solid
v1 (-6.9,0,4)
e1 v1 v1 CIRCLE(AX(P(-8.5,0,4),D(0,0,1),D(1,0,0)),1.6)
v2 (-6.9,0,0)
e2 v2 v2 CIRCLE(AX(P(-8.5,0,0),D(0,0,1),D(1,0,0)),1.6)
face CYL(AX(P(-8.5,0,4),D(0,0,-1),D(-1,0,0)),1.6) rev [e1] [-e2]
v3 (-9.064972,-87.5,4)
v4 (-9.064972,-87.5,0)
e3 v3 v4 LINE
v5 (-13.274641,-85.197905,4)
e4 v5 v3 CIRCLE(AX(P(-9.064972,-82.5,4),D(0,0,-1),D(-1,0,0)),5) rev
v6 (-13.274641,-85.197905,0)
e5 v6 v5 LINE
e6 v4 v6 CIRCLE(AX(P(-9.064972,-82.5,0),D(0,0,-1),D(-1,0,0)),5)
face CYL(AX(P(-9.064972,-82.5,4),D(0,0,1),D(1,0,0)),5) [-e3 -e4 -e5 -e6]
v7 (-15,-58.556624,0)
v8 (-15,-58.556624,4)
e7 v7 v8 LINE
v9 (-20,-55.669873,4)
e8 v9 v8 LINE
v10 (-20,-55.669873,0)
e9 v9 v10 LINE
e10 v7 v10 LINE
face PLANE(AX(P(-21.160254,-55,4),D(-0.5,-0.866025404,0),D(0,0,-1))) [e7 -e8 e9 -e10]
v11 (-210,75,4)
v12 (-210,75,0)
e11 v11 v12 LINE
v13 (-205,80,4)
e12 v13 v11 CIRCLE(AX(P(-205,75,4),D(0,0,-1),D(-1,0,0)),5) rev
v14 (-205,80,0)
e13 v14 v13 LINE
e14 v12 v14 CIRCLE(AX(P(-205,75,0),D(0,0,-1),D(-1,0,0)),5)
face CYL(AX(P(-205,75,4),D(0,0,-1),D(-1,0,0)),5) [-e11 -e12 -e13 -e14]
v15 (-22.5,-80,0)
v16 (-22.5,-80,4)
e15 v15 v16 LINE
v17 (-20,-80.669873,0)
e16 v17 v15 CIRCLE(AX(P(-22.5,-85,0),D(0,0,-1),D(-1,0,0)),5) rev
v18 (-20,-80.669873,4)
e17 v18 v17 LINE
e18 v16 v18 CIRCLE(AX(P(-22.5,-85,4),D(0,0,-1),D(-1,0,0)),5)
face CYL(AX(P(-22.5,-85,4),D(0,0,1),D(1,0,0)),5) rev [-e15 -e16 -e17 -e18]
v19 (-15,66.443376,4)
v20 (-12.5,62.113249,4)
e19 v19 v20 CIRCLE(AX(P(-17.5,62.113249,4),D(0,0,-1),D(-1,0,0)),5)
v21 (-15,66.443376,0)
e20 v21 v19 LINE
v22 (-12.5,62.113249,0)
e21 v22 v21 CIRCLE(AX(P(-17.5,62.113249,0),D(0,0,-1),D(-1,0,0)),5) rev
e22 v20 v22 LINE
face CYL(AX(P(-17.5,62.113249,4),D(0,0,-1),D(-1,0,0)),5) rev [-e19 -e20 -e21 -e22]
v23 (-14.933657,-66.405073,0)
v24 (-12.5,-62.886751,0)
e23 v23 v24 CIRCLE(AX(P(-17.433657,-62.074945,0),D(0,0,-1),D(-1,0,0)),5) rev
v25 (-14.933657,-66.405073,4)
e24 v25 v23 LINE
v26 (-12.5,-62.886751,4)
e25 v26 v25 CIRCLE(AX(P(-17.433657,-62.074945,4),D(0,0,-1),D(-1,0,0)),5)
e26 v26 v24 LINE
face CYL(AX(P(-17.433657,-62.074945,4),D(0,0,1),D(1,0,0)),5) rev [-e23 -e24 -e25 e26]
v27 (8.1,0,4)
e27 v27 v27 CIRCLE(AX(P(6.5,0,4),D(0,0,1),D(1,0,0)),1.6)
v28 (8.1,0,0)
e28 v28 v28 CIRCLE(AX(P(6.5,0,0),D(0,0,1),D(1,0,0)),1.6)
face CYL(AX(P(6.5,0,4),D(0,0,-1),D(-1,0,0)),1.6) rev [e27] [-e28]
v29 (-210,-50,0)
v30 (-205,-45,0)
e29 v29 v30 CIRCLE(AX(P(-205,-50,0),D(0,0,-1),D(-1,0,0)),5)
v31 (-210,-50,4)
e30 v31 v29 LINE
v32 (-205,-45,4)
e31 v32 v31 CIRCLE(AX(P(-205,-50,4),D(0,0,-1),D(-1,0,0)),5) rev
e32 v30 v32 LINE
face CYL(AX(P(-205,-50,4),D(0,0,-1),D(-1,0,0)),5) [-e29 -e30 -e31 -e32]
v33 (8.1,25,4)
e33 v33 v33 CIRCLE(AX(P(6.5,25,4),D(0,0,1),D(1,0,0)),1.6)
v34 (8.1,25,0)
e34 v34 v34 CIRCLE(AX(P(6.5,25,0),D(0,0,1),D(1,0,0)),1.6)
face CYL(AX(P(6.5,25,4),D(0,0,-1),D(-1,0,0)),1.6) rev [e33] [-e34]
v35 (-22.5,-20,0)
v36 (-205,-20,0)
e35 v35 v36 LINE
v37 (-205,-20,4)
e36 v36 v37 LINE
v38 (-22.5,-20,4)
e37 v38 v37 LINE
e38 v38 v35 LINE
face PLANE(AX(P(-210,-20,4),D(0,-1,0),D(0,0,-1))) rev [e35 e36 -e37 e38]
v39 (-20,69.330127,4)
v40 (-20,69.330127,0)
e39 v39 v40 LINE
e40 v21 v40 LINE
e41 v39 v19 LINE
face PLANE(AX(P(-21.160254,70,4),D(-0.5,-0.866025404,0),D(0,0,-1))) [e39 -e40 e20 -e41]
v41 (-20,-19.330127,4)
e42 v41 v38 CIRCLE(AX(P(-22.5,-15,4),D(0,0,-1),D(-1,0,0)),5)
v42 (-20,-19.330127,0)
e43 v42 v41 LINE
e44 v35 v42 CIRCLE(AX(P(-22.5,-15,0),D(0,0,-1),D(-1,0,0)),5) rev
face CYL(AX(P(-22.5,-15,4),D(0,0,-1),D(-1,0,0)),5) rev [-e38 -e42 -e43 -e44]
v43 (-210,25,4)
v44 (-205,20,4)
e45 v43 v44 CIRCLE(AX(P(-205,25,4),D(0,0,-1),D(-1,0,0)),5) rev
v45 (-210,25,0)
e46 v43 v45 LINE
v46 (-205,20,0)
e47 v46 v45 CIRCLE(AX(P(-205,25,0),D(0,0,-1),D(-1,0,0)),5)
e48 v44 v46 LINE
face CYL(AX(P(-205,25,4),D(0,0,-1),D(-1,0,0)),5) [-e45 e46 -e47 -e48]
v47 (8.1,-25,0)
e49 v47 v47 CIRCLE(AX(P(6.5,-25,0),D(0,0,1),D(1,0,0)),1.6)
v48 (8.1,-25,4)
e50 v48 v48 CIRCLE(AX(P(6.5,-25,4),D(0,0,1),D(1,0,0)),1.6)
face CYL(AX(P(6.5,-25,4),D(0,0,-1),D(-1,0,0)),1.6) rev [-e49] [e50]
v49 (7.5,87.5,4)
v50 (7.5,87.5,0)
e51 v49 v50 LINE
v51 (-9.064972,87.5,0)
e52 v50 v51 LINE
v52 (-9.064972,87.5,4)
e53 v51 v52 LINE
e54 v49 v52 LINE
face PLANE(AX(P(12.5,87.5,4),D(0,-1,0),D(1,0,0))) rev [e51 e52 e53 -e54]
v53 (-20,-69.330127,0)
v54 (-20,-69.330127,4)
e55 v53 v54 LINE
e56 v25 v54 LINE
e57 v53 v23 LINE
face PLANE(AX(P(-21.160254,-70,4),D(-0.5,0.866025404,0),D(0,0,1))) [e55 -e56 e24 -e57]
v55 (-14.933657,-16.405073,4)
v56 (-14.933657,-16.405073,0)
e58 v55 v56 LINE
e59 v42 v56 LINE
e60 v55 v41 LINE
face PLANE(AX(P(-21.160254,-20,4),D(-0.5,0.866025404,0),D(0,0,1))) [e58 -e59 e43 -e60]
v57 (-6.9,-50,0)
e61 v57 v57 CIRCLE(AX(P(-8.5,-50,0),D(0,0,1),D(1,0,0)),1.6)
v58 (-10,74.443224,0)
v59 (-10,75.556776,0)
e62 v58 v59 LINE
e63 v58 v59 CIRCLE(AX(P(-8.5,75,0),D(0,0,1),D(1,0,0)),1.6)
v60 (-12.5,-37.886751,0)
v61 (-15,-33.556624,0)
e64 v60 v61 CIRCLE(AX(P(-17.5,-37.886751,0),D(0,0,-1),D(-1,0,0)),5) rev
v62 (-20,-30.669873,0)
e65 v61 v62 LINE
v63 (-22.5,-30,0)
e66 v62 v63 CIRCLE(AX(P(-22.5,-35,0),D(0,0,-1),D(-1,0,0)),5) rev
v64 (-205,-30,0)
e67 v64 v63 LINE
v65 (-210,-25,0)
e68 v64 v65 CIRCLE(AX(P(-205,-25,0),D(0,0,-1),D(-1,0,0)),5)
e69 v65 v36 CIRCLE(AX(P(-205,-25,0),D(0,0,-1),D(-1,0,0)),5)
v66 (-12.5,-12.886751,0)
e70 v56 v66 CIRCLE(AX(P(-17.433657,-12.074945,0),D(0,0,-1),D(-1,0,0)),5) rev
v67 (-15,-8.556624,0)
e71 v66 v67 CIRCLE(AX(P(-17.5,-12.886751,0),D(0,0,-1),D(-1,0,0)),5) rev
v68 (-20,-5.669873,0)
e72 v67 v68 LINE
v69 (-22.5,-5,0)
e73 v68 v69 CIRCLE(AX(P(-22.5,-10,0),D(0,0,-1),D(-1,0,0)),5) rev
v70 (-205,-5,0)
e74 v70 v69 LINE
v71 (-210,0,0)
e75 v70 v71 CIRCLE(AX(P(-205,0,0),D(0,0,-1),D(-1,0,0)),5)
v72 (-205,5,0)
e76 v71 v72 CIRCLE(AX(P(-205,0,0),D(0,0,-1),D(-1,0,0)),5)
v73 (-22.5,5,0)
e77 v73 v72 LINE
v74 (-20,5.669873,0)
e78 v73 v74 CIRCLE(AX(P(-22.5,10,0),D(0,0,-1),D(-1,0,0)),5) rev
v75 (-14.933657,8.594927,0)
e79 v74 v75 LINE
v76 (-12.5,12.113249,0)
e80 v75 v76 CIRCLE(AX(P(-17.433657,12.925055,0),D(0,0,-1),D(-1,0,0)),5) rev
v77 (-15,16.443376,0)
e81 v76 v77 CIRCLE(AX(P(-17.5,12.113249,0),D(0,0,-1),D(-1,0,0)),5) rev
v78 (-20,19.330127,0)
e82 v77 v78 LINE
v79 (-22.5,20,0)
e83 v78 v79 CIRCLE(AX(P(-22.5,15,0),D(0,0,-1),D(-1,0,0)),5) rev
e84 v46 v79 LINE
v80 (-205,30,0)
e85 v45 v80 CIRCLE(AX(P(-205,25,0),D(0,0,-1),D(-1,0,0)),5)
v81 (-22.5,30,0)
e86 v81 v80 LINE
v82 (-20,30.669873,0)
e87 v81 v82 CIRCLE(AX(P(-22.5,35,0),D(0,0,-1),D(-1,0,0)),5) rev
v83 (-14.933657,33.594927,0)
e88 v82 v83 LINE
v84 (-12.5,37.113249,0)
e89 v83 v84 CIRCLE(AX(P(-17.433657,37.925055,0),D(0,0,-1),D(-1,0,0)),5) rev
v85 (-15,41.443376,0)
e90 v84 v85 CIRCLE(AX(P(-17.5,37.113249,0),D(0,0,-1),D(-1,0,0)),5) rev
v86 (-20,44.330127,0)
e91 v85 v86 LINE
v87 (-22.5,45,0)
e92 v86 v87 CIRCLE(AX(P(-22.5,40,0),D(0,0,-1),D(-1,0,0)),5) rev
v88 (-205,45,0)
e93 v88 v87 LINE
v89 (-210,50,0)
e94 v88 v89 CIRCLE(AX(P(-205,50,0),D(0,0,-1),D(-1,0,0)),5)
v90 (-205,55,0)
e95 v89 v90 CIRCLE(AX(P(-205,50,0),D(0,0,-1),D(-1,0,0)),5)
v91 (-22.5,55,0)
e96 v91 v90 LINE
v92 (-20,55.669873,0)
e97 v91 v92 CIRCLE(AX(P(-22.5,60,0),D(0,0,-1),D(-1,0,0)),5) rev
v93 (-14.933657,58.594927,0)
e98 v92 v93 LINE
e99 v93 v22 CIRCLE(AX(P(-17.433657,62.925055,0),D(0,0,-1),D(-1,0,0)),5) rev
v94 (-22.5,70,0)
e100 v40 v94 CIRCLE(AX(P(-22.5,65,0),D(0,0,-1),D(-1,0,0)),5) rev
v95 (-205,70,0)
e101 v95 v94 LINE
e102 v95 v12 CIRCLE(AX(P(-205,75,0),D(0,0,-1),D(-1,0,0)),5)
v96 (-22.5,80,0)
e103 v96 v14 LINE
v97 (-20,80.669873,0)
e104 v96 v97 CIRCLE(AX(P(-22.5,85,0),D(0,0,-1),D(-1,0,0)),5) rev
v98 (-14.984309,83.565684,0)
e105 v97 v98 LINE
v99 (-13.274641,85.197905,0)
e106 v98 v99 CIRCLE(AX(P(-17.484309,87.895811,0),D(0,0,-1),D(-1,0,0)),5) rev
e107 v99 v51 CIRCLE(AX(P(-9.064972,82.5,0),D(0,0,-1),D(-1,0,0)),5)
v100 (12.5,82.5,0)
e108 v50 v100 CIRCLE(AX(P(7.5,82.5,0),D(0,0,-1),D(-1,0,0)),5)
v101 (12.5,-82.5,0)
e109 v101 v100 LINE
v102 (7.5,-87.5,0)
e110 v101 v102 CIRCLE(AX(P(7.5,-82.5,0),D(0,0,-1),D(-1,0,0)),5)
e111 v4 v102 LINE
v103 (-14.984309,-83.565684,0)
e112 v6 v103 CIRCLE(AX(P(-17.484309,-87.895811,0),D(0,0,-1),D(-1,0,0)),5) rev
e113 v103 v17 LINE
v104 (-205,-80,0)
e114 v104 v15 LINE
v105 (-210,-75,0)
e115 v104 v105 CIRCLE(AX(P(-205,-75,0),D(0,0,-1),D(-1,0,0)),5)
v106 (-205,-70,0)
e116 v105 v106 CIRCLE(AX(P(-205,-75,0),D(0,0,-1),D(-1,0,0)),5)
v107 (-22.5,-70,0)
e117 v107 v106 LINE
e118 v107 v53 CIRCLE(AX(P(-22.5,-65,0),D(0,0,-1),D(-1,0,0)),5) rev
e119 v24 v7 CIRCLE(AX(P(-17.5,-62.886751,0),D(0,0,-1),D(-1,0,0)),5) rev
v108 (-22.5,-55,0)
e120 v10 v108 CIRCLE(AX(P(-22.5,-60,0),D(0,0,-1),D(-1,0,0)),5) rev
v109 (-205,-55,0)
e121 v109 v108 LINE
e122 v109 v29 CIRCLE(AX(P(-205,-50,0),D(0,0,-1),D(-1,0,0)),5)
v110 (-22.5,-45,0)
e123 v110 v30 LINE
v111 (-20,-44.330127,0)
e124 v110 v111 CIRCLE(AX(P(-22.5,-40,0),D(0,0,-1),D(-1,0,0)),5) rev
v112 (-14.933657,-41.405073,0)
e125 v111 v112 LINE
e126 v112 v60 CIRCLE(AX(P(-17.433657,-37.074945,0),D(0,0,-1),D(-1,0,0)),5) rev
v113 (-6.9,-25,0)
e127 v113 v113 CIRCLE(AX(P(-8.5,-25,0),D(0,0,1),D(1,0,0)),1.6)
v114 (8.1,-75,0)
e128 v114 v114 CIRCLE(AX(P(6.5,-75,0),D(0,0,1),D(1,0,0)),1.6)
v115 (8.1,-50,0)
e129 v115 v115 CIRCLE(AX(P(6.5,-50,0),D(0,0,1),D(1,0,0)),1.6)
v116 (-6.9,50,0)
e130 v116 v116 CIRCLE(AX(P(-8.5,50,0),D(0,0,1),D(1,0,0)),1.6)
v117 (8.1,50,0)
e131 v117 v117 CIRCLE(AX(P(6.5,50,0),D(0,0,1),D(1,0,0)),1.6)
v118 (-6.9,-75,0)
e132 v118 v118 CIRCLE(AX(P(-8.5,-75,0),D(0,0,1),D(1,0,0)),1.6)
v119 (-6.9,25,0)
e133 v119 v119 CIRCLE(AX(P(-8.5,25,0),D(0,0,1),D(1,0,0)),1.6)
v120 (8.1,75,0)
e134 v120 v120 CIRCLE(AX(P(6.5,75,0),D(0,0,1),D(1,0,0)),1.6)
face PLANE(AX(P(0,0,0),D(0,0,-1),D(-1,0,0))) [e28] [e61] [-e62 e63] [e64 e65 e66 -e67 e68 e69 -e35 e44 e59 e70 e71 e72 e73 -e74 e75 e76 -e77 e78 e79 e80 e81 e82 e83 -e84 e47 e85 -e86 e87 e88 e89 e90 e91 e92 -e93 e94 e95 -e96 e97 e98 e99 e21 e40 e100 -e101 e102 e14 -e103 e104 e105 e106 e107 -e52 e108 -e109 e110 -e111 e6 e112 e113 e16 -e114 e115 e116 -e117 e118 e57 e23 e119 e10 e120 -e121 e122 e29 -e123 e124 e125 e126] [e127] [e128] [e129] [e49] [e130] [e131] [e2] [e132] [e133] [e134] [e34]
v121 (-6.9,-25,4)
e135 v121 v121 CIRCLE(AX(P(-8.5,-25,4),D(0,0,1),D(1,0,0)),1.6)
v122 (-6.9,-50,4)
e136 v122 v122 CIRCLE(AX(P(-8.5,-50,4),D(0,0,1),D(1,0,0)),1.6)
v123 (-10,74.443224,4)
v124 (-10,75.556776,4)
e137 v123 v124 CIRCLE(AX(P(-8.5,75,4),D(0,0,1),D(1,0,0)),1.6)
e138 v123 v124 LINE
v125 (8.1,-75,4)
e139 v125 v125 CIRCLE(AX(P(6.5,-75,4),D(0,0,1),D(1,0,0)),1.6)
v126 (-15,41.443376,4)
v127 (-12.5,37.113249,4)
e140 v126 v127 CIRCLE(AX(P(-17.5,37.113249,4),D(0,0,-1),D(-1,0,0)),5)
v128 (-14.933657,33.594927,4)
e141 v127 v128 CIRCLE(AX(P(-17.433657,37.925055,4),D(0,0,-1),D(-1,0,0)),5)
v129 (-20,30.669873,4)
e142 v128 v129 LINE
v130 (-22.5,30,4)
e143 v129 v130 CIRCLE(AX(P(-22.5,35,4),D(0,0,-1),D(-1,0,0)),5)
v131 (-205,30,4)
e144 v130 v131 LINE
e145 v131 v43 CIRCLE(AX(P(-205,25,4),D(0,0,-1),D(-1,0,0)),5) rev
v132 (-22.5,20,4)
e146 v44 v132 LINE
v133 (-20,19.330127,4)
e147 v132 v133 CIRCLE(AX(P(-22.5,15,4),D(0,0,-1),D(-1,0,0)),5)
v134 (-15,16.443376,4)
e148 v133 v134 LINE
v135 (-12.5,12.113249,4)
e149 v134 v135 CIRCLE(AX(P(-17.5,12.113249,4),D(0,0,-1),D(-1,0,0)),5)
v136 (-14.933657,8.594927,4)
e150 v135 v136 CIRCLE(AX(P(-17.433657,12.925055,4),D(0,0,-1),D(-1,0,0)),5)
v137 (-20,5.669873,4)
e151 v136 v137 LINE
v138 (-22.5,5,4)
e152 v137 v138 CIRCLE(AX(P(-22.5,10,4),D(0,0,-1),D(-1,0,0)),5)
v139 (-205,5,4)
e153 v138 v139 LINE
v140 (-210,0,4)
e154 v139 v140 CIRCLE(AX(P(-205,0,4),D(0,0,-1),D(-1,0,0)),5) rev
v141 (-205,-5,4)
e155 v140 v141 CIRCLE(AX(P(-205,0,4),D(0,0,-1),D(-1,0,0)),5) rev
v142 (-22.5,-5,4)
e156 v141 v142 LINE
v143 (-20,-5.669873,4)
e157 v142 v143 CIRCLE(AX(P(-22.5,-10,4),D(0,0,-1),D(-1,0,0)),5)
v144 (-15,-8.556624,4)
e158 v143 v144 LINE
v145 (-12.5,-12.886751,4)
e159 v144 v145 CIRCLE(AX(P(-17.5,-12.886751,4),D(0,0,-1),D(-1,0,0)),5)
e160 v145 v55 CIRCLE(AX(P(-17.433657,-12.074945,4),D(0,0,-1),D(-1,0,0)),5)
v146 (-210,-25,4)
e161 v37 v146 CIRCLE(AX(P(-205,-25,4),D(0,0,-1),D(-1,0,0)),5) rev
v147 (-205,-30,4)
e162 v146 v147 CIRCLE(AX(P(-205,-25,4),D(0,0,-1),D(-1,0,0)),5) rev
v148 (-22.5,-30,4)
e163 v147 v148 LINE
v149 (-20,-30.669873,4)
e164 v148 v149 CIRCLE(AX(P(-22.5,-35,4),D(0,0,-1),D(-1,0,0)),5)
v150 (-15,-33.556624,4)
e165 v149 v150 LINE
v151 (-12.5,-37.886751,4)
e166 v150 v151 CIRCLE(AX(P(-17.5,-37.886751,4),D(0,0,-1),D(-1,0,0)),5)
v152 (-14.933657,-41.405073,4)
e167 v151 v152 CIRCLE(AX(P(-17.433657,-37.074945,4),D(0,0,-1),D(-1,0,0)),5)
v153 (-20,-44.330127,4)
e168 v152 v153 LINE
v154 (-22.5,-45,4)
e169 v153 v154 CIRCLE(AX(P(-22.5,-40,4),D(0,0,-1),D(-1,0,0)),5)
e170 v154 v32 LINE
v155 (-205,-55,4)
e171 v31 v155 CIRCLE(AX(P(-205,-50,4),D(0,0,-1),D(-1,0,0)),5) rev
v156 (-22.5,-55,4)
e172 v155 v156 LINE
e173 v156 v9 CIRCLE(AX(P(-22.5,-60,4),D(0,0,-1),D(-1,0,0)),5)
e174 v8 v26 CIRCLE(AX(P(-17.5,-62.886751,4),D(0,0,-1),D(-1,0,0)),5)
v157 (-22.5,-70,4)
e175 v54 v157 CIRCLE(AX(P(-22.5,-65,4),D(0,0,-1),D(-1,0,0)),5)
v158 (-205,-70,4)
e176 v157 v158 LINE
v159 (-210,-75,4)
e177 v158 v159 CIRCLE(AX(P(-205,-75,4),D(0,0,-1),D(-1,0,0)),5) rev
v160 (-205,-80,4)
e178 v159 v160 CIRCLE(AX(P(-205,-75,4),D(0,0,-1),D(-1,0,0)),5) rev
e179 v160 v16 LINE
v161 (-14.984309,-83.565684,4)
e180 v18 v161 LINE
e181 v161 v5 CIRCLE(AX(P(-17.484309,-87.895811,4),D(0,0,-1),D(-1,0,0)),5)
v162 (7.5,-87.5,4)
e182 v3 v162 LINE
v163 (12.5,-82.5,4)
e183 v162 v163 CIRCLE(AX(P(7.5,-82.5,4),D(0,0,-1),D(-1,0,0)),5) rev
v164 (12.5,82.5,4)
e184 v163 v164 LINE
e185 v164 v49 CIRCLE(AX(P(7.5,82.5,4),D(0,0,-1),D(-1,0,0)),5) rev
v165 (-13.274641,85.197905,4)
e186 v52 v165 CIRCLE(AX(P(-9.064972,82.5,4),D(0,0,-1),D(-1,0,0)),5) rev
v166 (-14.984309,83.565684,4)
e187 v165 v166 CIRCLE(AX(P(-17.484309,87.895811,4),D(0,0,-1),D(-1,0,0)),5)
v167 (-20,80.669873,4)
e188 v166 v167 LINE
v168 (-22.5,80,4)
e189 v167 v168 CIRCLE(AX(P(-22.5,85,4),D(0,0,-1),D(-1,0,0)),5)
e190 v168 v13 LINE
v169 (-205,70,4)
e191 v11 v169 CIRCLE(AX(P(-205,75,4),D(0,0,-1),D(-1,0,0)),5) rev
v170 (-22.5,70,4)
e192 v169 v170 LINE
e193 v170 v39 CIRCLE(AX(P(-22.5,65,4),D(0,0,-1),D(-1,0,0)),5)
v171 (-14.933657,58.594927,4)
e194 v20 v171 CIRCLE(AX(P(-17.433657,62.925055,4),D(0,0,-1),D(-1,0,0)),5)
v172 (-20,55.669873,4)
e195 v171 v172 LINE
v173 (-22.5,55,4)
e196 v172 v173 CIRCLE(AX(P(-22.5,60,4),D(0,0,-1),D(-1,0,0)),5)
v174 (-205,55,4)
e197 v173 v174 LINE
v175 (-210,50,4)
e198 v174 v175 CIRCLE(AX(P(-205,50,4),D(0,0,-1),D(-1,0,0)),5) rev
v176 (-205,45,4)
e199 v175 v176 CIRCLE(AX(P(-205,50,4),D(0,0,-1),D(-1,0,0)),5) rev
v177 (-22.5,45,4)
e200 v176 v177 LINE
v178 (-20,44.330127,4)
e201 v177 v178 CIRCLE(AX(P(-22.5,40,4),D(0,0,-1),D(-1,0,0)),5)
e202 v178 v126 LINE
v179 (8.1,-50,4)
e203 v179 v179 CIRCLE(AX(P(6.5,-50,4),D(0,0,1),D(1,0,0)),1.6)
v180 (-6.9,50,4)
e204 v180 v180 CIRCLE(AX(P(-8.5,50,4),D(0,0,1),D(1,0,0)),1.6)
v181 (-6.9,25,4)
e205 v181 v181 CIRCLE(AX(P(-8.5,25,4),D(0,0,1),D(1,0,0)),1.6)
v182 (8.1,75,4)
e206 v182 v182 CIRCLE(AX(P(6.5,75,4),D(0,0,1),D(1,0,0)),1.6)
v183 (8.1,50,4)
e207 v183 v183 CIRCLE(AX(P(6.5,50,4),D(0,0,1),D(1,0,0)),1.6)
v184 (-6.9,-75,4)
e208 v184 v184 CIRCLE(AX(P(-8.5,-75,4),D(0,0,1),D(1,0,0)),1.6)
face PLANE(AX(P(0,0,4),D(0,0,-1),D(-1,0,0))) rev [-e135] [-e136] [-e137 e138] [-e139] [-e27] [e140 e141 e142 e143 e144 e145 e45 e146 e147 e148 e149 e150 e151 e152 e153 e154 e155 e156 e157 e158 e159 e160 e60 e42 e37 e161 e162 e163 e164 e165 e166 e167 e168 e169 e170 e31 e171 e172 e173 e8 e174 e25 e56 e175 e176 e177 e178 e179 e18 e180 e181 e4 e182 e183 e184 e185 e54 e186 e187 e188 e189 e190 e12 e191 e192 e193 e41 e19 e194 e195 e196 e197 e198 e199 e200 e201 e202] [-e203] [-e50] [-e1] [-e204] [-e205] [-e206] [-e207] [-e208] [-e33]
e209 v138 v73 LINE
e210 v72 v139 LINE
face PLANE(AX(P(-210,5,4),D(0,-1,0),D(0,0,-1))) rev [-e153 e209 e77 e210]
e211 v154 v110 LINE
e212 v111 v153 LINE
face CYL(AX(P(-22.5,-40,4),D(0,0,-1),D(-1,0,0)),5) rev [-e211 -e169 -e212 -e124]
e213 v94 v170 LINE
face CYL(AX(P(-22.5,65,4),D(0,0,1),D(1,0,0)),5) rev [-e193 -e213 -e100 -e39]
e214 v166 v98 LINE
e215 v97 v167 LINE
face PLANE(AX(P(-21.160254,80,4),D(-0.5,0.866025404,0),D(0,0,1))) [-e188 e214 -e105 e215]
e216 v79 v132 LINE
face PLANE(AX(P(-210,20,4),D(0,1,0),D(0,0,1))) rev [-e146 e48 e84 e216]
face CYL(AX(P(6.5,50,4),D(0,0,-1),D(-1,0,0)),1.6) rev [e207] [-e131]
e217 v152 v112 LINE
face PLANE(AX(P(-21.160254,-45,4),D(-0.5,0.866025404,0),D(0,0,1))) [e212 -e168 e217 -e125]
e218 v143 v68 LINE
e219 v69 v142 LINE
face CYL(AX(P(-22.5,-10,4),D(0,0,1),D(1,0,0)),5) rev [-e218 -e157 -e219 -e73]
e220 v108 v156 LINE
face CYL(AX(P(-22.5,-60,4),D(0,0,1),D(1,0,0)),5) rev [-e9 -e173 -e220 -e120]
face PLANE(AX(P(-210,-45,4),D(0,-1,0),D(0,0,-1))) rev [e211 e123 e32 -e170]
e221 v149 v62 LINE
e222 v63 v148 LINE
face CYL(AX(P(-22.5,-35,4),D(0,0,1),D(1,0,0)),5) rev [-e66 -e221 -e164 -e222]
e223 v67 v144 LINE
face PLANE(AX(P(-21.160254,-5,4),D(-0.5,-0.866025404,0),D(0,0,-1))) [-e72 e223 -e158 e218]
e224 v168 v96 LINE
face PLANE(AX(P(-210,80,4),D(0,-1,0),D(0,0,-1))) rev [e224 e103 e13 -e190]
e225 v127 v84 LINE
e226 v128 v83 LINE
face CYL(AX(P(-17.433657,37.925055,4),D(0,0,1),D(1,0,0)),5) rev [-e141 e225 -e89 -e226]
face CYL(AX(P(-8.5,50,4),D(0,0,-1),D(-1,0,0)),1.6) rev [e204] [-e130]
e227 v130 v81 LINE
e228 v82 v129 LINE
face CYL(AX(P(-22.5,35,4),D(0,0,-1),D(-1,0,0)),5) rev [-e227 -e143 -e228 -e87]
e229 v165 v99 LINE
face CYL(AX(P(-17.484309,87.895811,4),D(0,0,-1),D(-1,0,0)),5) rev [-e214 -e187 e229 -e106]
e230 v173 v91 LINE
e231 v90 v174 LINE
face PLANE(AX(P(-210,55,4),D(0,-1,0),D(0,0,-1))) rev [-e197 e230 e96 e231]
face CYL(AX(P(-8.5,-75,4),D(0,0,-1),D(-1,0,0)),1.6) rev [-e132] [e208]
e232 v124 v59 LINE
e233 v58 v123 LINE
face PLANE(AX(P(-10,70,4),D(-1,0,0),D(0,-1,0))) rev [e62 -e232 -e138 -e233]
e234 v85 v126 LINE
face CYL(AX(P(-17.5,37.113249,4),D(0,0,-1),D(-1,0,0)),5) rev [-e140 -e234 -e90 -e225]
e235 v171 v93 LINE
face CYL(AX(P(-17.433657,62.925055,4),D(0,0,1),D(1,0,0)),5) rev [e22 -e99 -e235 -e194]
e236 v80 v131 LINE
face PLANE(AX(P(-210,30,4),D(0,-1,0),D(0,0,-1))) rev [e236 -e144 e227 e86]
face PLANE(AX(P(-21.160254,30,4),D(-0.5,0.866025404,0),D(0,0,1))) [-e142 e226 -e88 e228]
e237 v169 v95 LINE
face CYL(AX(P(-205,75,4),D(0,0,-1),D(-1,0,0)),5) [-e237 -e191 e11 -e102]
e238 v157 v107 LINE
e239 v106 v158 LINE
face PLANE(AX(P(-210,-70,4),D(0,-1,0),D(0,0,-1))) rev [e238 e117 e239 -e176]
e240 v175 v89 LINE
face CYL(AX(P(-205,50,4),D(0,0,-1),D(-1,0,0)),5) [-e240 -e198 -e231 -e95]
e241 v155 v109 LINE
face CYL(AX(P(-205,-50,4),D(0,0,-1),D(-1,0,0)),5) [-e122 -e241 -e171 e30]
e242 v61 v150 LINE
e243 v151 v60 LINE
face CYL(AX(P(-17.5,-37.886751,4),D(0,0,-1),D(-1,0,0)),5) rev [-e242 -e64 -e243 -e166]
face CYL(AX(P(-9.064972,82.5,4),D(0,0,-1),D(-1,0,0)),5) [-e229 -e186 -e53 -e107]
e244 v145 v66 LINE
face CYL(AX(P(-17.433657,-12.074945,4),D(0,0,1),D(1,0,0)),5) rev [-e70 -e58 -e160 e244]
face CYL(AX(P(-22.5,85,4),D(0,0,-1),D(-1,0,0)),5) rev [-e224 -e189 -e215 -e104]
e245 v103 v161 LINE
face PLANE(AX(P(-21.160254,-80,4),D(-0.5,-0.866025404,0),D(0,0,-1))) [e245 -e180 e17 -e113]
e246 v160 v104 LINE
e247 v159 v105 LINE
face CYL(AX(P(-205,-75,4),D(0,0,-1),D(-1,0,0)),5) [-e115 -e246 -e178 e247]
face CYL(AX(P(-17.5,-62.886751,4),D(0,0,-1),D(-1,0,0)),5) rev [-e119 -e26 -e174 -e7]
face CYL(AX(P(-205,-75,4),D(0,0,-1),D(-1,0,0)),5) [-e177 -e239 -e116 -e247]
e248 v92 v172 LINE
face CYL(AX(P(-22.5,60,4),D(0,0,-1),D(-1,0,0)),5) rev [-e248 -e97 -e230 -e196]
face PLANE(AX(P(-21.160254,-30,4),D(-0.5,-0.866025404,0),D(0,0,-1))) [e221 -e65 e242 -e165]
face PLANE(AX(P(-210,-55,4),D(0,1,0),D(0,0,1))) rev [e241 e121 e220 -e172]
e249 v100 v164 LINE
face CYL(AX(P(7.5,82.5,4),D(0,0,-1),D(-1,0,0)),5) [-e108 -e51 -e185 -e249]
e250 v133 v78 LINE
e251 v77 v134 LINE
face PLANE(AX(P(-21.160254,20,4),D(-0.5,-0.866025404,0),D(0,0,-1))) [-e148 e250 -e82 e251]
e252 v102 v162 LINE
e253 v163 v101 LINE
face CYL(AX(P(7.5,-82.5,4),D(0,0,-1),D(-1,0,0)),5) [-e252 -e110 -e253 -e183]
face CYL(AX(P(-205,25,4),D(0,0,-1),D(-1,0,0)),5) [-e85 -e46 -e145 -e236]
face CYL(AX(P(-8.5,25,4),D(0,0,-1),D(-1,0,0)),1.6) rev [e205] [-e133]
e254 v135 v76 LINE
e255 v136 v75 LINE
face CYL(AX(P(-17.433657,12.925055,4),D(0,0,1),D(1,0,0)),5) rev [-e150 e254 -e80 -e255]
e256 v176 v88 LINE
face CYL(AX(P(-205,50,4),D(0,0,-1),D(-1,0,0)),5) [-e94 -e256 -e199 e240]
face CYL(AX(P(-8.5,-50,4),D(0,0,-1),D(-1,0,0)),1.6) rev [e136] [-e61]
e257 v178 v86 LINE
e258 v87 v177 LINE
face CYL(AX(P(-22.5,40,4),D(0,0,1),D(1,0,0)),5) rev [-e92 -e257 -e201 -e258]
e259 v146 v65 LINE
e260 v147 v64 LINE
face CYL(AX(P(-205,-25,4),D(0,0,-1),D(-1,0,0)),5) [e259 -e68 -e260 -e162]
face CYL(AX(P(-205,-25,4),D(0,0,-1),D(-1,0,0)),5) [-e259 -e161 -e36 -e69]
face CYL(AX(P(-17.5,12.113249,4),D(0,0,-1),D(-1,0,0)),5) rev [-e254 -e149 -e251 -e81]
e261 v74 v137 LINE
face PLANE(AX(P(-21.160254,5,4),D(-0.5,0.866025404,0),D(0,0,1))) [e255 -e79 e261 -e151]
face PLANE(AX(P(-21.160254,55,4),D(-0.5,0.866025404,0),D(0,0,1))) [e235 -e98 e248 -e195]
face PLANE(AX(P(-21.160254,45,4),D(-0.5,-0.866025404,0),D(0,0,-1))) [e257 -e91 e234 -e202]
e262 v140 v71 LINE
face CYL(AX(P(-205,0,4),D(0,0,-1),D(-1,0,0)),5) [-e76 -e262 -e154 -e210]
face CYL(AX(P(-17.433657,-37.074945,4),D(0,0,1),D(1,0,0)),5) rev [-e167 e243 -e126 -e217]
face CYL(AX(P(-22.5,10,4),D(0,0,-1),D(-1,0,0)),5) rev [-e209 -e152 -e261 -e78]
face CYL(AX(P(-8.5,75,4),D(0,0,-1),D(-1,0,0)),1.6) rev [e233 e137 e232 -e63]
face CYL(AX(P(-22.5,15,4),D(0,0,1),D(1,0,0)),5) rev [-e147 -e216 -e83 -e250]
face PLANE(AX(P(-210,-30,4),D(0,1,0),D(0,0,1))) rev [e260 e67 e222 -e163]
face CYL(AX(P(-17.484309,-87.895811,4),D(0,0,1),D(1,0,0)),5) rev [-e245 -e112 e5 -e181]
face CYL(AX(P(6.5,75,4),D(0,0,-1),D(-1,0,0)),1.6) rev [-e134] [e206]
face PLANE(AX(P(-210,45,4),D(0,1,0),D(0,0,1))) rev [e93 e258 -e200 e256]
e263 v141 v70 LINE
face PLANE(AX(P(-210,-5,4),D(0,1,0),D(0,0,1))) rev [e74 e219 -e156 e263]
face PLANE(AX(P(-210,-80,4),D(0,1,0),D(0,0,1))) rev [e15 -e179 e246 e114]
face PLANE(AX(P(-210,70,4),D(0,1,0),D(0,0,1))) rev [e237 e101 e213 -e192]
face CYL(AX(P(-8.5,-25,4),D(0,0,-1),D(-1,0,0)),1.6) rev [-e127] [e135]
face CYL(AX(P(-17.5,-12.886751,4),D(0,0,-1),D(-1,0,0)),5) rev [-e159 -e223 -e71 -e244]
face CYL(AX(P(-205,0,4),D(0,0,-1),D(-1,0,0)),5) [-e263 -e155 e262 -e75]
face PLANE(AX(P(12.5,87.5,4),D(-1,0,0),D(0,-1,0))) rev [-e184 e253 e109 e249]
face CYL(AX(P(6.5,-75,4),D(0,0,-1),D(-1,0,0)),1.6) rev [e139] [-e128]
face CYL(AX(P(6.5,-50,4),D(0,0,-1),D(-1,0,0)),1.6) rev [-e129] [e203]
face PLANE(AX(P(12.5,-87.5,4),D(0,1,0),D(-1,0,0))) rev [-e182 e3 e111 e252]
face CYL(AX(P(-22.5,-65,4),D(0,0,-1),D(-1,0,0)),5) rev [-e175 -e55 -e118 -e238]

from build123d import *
from OCP.BRepFilletAPI import BRepFilletAPI_MakeChamfer

# Parameters (mm, degrees)
SKETCH_1_W                  = 25
SKETCH_1_H                  = 175
EXTRUDE_1_DEPTH             = 4
SKETCH_3_R                  = 1.6
CUT_EXTRUDE_1_DEPTH         = 89.478811023
SKETCH_4_W                  = 200
SKETCH_4_H                  = 10
EXTRUDE_2_DEPTH             = 4
CHAMFER_1_SIZE              = 5
CHAMFER_1_SIZE2             = 8.660254038
FILLET_1_R                  = 5
PATTERN_LINEAR_2_DEPTH      = 4
FILLET_2_R                  = 5
PATTERN_LINEAR_3_COUNT      = 2
PATTERN_LINEAR_3_PITCH      = 15
PATTERN_LINEAR_3_COUNT_DIR2 = 7
PATTERN_LINEAR_3_PITCH_DIR2 = 25


# Read off the part's stored shape, not the designer's step: 阵列(线性)2
with BuildPart() as part:
    # 草图1 → 凸台-拉伸1 (new body)
    with BuildSketch(Plane.XY):
        Rectangle(SKETCH_1_W, SKETCH_1_H)
    extrude(amount=EXTRUDE_1_DEPTH)

    # 草图3 → 切除-拉伸1 (cut, through all)
    with BuildSketch(Plane.XY):
        with Locations((-8.5, 75)):
            Circle(SKETCH_3_R)
    cut_extrude_1 = extrude(amount=CUT_EXTRUDE_1_DEPTH, mode=Mode.SUBTRACT)

    # 草图4 → 凸台-拉伸2 (add)
    with BuildSketch(Plane.XY):
        with Locations((-110, 75)):
            Rectangle(SKETCH_4_W, SKETCH_4_H)
    extrude(amount=EXTRUDE_2_DEPTH)

    # 倒角1: one chamfer whose edges measure the first distance from different faces: ONE call of the kernel's chamfer builder (chamfer() names one face for all edges)
    chamfer_1_edges_1 = [part.edges().sort_by_distance(p)[0] for p in [
        (-12.5, 80, 2),
    ]]
    chamfer_1_side_1 = [part.faces().sort_by_distance(p)[0] for p in [
        (-12.5, 83.75, 2),
    ]]
    chamfer_1_edges_2 = [part.edges().sort_by_distance(p)[0] for p in [
        (-12.5, 70, 2),
    ]]
    chamfer_1_side_2 = [part.faces().sort_by_distance(p)[0] for p in [
        (-12.5, -8.75, 2),
    ]]
    chamfer_1 = BRepFilletAPI_MakeChamfer(part.part.solid().wrapped)
    for e in chamfer_1_edges_1:
        chamfer_1.Add(CHAMFER_1_SIZE, CHAMFER_1_SIZE2, e.wrapped, chamfer_1_side_1[0].wrapped)  # the first distance lies on this face
    for e in chamfer_1_edges_2:
        chamfer_1.Add(CHAMFER_1_SIZE, CHAMFER_1_SIZE2, e.wrapped, chamfer_1_side_2[0].wrapped)  # the first distance lies on this face
    add(Compound.cast(chamfer_1.Shape()), mode=Mode.REPLACE)

    # 圆角1
    # the kernel refuses this fillet: 5 mm, written as the material it adds along each edge
    with BuildSketch(Plane(origin=(-21.160254038, 70, 0), x_dir=(-1, 0, 0), z_dir=(0, 0, 1))) as fillet_1_piece_1:
        with BuildLine():
            CenterArc((FILLET_1_R * 0.267949192431, FILLET_1_R), FILLET_1_R, 240, 30)
            Line((-FILLET_1_R * 0.232050807569, FILLET_1_R * 0.133974596216), (0, 0))
            Line((0, 0), (FILLET_1_R * 0.267949192431, 0))
        make_face()
    extrude(amount=4)
    with BuildSketch(Plane(origin=(-12.5, 65, 0), x_dir=(0, -1, 0), z_dir=(0, 0, 1))) as fillet_1_piece_2:
        with BuildLine():
            CenterArc((FILLET_1_R * 0.57735026919, -FILLET_1_R), FILLET_1_R, 90, 60)
            Line((-FILLET_1_R * 0.288675134595, -FILLET_1_R * 0.5), (0, 0))
            Line((0, 0), (FILLET_1_R * 0.57735026919, 0))
        make_face()
    extrude(amount=4)
    with BuildSketch(Plane(origin=(-21.160254038, 80, 4), x_dir=(0.8660254037844394, 0.4999999999999988, 0), z_dir=(0, 0, -1))) as fillet_1_piece_3:
        with BuildLine():
            CenterArc((FILLET_1_R * 0.267949192431, -FILLET_1_R), FILLET_1_R, 90, 30)
            Line((-FILLET_1_R * 0.232050807569, -FILLET_1_R * 0.133974596216), (0, 0))
            Line((0, 0), (FILLET_1_R * 0.267949192431, 0))
        make_face()
    extrude(amount=4)
    with BuildSketch(Plane(origin=(-12.5, 85, 4), x_dir=(-2.0790480448337104e-12, 1.0, 0), z_dir=(0, 0, -1))) as fillet_1_piece_4:
        with BuildLine():
            CenterArc((2.895810682, -4.984308769), FILLET_1_R, 94.540406951, 55.459593049)
            Line((-1.434316336, -2.484308769), (0, 0))
            Line((0, 0), (2.5, 0))
        make_face()
    extrude(amount=4)
    # the kernel refuses this fillet: 5 mm, written as the material it takes off along each edge
    with BuildSketch(Plane(origin=(-210, 70, -12.5), x_dir=(0, 1, 0), z_dir=(0, 0, 1)), Plane(origin=(-210, 80, -12.5), x_dir=(1, 0, 0), z_dir=(0, 0, 1))) as fillet_1_2_piece_1:
        with BuildLine():
            CenterArc((FILLET_1_R, -FILLET_1_R), FILLET_1_R, 90, 90)
            Line((0, -FILLET_1_R), (0, 0))
            Line((0, 0), (FILLET_1_R, 0))
        make_face()
    extrude(amount=29, mode=Mode.SUBTRACT)

    # 阵列(线性)2 outline → 阵列(线性)2 (add)
    with BuildSketch(Plane.XY):
        with BuildLine():
            Line((-12.5, -87.5), (-12.5, -62.886751346))
            ThreePointArc((-12.5, -62.886751346), (-13.321545605, -64.919332951), (-14.933656987, -66.405072517))
            Line((-14.933656987, -66.405072517), (-20, -69.330127019))
            ThreePointArc((-20, -69.330127019), (-21.205904775, -69.829629131), (-22.5, -70))
            Line((-22.5, -70), (-205, -70))
            ThreePointArc((-205, -70), (-208.535533906, -71.464466094), (-210, -75))
            ThreePointArc((-210, -75), (-208.535533906, -78.535533906), (-205, -80))
            Line((-205, -80), (-22.5, -80))
            ThreePointArc((-22.5, -80), (-21.205904775, -80.170370869), (-20, -80.669872981))
            Line((-20, -80.669872981), (-14.984308769, -83.565683664))
            ThreePointArc((-14.984308769, -83.565683664), (-13.256610731, -85.226247178), (-12.5, -87.5))
        make_face()
        with BuildLine():
            Line((-12.5, -62.886751346), (-12.5, -37.886751346))
            ThreePointArc((-12.5, -37.886751346), (-13.321545605, -39.919332951), (-14.933656987, -41.405072517))
            Line((-14.933656987, -41.405072517), (-20, -44.330127019))
            ThreePointArc((-20, -44.330127019), (-21.205904775, -44.829629131), (-22.5, -45))
            Line((-22.5, -45), (-205, -45))
            ThreePointArc((-205, -45), (-208.535533906, -46.464466094), (-210, -50))
            ThreePointArc((-210, -50), (-208.535533906, -53.535533906), (-205, -55))
            Line((-205, -55), (-22.5, -55))
            ThreePointArc((-22.5, -55), (-21.205904775, -55.170370869), (-20, -55.669872981))
            Line((-20, -55.669872981), (-15, -58.556624327))
            ThreePointArc((-15, -58.556624327), (-13.169872981, -60.386751346), (-12.5, -62.886751346))
        make_face()
        with BuildLine():
            Line((-12.5, -37.886751346), (-12.5, -12.886751346))
            ThreePointArc((-12.5, -12.886751346), (-13.321545605, -14.919332951), (-14.933656987, -16.405072517))
            Line((-14.933656987, -16.405072517), (-20, -19.330127019))
            ThreePointArc((-20, -19.330127019), (-21.205904775, -19.829629131), (-22.5, -20))
            Line((-22.5, -20), (-205, -20))
            ThreePointArc((-205, -20), (-208.535533906, -21.464466094), (-210, -25))
            ThreePointArc((-210, -25), (-208.535533906, -28.535533906), (-205, -30))
            Line((-205, -30), (-22.5, -30))
            ThreePointArc((-22.5, -30), (-21.205904775, -30.170370869), (-20, -30.669872981))
            Line((-20, -30.669872981), (-15, -33.556624327))
            ThreePointArc((-15, -33.556624327), (-13.169872981, -35.386751346), (-12.5, -37.886751346))
        make_face()
        with BuildLine():
            Line((-12.5, -12.886751346), (-12.5, 12.113248654))
            ThreePointArc((-12.5, 12.113248654), (-13.321545605, 10.080667049), (-14.933656987, 8.594927483))
            Line((-14.933656987, 8.594927483), (-20, 5.669872981))
            ThreePointArc((-20, 5.669872981), (-21.205904775, 5.170370869), (-22.5, 5))
            Line((-22.5, 5), (-205, 5))
            ThreePointArc((-205, 5), (-208.535533906, 3.535533906), (-210, 0))
            ThreePointArc((-210, 0), (-208.535533906, -3.535533906), (-205, -5))
            Line((-205, -5), (-22.5, -5))
            ThreePointArc((-22.5, -5), (-21.205904775, -5.170370869), (-20, -5.669872981))
            Line((-20, -5.669872981), (-15, -8.556624327))
            ThreePointArc((-15, -8.556624327), (-13.169872981, -10.386751346), (-12.5, -12.886751346))
        make_face()
        with BuildLine():
            Line((-12.5, 12.113248654), (-12.5, 37.113248654))
            ThreePointArc((-12.5, 37.113248654), (-13.321545605, 35.080667049), (-14.933656987, 33.594927483))
            Line((-14.933656987, 33.594927483), (-20, 30.669872981))
            ThreePointArc((-20, 30.669872981), (-21.205904775, 30.170370869), (-22.5, 30))
            Line((-22.5, 30), (-205, 30))
            ThreePointArc((-205, 30), (-208.535533906, 28.535533906), (-210, 25))
            ThreePointArc((-210, 25), (-208.535533906, 21.464466094), (-205, 20))
            Line((-205, 20), (-22.5, 20))
            ThreePointArc((-22.5, 20), (-21.205904775, 19.829629131), (-20, 19.330127019))
            Line((-20, 19.330127019), (-15, 16.443375673))
            ThreePointArc((-15, 16.443375673), (-13.169872981, 14.613248654), (-12.5, 12.113248654))
        make_face()
        with BuildLine():
            Line((-22.5, 55), (-205, 55))
            ThreePointArc((-205, 55), (-208.535533906, 53.535533906), (-210, 50))
            ThreePointArc((-210, 50), (-208.535533906, 46.464466094), (-205, 45))
            Line((-205, 45), (-22.5, 45))
            ThreePointArc((-22.5, 45), (-21.205904775, 44.829629131), (-20, 44.330127019))
            Line((-20, 44.330127019), (-15, 41.443375673))
            ThreePointArc((-15, 41.443375673), (-13.169872981, 39.613248654), (-12.5, 37.113248654))
            Line((-12.5, 37.113248654), (-12.5, 62.113248654))
            ThreePointArc((-12.5, 62.113248654), (-13.321545605, 60.080667049), (-14.933656987, 58.594927483))
            Line((-14.933656987, 58.594927483), (-20, 55.669872981))
            ThreePointArc((-20, 55.669872981), (-21.205904775, 55.170370869), (-22.5, 55))
        make_face()
    extrude(amount=PATTERN_LINEAR_2_DEPTH)

    # 圆角2
    fillet_2_edges = [part.edges().sort_by_distance(p)[0] for p in [
        (-12.5, 87.5, 2),
        (12.5, 87.5, 2),
        (12.5, -87.5, 2),
        (-12.5, -87.5, 2),
    ]]
    fillet(fillet_2_edges, radius=FILLET_2_R)

    # 阵列(线性)3: Cut-Extrude 1 2 × 7
    with Locations(*[(i * PATTERN_LINEAR_3_PITCH, -j * PATTERN_LINEAR_3_PITCH_DIR2, 0) for i in range(PATTERN_LINEAR_3_COUNT) for j in range(PATTERN_LINEAR_3_COUNT_DIR2) if (i, j) != (0, 0)]):
        add(cut_extrude_1, mode=Mode.SUBTRACT)


solid = part.part
